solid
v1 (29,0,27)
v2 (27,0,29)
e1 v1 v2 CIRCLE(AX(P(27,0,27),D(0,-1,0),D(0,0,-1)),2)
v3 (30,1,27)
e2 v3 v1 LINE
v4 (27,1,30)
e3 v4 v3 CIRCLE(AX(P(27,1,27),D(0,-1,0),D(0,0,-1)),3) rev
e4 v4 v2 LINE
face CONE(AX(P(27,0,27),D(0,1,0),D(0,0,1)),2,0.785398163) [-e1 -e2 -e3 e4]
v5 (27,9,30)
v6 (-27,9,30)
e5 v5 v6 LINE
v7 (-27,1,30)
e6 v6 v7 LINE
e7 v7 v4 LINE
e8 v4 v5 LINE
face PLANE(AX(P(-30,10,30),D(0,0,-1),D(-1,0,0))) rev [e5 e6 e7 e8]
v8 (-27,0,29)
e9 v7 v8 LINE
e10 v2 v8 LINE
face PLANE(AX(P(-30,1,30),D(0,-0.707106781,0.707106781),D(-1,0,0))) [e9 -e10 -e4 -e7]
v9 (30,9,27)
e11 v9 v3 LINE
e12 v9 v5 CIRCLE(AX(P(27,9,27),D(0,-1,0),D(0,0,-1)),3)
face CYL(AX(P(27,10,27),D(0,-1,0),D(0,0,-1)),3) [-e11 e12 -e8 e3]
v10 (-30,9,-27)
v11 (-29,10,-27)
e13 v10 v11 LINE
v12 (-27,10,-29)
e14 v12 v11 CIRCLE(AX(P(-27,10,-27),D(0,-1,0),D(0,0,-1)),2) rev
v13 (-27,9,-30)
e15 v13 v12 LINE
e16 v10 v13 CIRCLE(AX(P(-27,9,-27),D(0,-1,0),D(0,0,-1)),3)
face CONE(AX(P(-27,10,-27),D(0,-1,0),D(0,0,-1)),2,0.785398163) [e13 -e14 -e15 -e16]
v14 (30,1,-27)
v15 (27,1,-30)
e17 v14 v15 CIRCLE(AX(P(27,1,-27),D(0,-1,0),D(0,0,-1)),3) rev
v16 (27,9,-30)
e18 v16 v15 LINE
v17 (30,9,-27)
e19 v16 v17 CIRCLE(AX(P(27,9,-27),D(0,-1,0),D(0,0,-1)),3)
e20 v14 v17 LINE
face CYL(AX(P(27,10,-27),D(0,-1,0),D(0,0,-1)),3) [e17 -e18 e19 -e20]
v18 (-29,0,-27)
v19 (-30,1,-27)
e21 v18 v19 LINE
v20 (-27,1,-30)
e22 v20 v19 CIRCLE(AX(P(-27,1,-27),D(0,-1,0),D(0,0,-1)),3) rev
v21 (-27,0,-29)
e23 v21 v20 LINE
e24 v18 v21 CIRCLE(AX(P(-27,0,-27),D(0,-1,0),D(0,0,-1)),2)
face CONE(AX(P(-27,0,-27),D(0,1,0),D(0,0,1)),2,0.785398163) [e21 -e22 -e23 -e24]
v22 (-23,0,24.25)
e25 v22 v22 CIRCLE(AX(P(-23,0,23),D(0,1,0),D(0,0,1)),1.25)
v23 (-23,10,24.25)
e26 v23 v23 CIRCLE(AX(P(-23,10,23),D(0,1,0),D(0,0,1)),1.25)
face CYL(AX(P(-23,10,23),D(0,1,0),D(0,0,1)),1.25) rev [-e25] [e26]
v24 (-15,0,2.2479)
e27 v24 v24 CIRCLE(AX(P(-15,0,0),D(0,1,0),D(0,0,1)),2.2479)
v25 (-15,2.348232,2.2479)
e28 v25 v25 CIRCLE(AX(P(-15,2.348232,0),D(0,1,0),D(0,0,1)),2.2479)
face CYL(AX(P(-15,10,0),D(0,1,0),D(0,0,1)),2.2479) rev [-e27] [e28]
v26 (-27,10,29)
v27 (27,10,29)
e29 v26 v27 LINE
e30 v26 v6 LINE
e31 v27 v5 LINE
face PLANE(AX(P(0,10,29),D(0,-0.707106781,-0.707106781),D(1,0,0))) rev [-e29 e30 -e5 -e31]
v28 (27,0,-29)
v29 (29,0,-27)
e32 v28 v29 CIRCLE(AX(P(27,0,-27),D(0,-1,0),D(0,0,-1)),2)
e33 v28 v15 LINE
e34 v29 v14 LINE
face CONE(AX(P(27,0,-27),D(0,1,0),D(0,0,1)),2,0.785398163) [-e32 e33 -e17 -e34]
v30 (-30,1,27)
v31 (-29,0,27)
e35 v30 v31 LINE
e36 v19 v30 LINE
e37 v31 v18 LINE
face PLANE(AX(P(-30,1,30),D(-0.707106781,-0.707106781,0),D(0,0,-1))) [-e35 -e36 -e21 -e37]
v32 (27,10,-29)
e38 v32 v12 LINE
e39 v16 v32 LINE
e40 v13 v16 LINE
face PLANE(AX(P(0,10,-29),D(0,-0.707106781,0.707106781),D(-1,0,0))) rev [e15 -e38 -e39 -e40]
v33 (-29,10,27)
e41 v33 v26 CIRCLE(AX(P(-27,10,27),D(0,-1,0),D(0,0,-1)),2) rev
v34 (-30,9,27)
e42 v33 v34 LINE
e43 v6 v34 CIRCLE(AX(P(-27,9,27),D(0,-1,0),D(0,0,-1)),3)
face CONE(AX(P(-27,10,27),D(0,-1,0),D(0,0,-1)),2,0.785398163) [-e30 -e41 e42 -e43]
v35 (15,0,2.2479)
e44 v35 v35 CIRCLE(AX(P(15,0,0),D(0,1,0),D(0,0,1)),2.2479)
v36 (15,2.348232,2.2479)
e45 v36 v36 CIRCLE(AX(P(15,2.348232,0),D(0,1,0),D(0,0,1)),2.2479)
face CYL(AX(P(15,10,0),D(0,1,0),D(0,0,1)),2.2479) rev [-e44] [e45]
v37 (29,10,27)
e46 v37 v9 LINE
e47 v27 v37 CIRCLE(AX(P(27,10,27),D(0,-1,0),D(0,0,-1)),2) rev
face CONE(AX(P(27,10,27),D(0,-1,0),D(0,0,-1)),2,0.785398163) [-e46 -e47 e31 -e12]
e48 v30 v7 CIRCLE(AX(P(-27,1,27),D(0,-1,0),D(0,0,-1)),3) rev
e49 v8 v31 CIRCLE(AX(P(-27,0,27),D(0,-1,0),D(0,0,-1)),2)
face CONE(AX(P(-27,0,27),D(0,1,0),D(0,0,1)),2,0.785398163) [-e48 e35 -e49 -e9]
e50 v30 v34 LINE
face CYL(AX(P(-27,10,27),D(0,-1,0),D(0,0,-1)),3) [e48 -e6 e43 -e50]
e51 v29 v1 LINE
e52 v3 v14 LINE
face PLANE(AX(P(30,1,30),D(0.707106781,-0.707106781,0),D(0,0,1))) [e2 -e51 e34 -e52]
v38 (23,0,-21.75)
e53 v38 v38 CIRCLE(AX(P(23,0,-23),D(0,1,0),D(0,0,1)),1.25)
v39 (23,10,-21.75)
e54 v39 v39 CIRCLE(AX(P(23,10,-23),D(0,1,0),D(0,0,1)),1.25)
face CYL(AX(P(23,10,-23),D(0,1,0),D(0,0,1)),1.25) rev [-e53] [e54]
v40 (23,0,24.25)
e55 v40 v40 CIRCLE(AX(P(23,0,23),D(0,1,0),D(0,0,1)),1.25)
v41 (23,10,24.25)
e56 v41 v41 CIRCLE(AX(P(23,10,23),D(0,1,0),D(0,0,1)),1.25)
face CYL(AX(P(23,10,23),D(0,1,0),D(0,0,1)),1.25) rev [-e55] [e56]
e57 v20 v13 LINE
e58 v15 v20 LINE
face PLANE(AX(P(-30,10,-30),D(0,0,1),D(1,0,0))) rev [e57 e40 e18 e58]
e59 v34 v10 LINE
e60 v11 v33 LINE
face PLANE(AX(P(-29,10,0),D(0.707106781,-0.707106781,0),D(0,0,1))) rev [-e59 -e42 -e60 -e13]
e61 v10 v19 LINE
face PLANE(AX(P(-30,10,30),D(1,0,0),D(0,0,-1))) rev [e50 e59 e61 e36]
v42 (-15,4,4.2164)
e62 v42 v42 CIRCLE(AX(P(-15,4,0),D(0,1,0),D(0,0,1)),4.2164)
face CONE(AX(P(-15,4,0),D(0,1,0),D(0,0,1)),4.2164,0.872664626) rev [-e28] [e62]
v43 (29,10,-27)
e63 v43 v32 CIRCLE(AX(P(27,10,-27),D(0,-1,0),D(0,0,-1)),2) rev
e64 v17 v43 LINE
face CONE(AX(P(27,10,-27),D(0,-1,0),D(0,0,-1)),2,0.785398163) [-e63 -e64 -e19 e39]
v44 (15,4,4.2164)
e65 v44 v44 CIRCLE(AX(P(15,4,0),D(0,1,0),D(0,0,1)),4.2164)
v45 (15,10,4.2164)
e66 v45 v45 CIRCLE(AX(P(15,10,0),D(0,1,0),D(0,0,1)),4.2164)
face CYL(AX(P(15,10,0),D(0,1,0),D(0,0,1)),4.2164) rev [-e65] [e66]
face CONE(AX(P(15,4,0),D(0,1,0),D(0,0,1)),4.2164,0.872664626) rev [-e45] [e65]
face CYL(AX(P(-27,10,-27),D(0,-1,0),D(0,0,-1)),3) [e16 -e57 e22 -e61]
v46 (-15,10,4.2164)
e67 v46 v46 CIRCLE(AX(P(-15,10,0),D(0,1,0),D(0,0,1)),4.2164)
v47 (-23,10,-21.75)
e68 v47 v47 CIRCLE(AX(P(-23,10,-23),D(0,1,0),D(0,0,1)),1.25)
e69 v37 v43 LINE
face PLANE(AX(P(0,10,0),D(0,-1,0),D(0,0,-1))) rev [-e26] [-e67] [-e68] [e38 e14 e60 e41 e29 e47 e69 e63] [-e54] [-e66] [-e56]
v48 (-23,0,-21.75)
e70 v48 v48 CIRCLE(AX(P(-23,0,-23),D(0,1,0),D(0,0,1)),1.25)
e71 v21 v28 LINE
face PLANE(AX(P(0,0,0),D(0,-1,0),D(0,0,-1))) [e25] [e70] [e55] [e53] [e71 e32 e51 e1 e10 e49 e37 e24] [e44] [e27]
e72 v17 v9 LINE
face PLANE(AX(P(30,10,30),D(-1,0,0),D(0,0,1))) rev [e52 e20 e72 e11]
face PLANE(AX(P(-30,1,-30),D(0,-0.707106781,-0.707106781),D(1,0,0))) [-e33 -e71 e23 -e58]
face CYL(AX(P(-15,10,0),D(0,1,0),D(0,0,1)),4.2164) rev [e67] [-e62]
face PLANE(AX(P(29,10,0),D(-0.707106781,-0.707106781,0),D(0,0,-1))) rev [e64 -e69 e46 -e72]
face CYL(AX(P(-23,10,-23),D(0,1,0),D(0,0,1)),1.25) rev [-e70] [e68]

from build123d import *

# Parameters (mm, degrees)
SKETCH1_W                                 = 60
SKETCH1_H                                 = 60
BOSS_EXTRUDE1_DEPTH                       = 10
FILLET1_R                                 = 3
M3X0_5_TAPPED_HOLE1_OUTLINE_R             = 1.25
M3X0_5_TAPPED_HOLE1_DEPTH                 = 10
CSK_FOR_8_FLAT_HEAD_MACHINE_SCREW_2_COUNT = 2
CSK_FOR_8_FLAT_HEAD_MACHINE_SCREW_2_PITCH = 30
CHAMFER1_SIZE                             = 1


# Read off the part's stored shape, not the designer's step: M3x0.5 Tapped Hole1
with BuildPart() as part:
    # Sketch1 → Boss-Extrude1 (new body)
    with BuildSketch(Plane(origin=(0, 0, 0), x_dir=(1, 0, 0), z_dir=(0, 1, 0))):
        Rectangle(SKETCH1_W, SKETCH1_H)
    extrude(amount=BOSS_EXTRUDE1_DEPTH)

    # Fillet1
    fillet1_edges = [part.edges().sort_by_distance(p)[0] for p in [
        (30, 5, 30),
        (-30, 5, 30),
        (-30, 5, -30),
        (30, 5, -30),
    ]]
    fillet(fillet1_edges, radius=FILLET1_R)

    # M3x0.5 Tapped Hole1 outline → M3x0.5 Tapped Hole1 (cut)
    with BuildSketch(Plane(origin=(0, 0, 0), x_dir=(1, 0, 0), z_dir=(0, 1, 0))):
        with Locations((23, -23)):
            Circle(M3X0_5_TAPPED_HOLE1_OUTLINE_R)
        with Locations((-23, 23)):
            Circle(M3X0_5_TAPPED_HOLE1_OUTLINE_R)
        with Locations((-23, -23)):
            Circle(M3X0_5_TAPPED_HOLE1_OUTLINE_R)
        with Locations((23, 23)):
            Circle(M3X0_5_TAPPED_HOLE1_OUTLINE_R)
    extrude(amount=M3X0_5_TAPPED_HOLE1_DEPTH, mode=Mode.SUBTRACT)

    # Sketch7 → CSK for #8 Flat Head Machine Screw (100)2 (revolve, cut)
    with BuildSketch(Plane(origin=(15, 10, 0), x_dir=(0, 0, 1), z_dir=(1, 0, 0))):
        Polygon((0, 0), (0, 10), (2.2479, 10), (2.2479, 7.651767624), (4.2164, 6), (4.2164, 0), align=None)
    csk_for_8_flat_head_machine_screw_100 = revolve(axis=Axis((15, 16.35, 0), (0, -1, 0)), mode=Mode.SUBTRACT)

    # CSK for _8 Flat Head Machine Screw _ 2: CSK for #8 Flat Head Machine Screw (100)2 ×2
    with Locations(*[(-i * CSK_FOR_8_FLAT_HEAD_MACHINE_SCREW_2_PITCH, 0, 0) for i in range(1, CSK_FOR_8_FLAT_HEAD_MACHINE_SCREW_2_COUNT)]):
        add(csk_for_8_flat_head_machine_screw_100, mode=Mode.SUBTRACT)

    # Chamfer1
    chamfer1_edges = [part.edges().sort_by_distance(p)[0] for p in [
        (-30, 0, 0),
        (-30, 10, 0),
        (30, 0, 0),
        (0, 0, 30),
        (0, 0, -30),
        (-29.121320344, 0, 29.121320344),
        (29.121320344, 0, 29.121320344),
        (29.121320344, 0, -29.121320344),
        (-29.121320344, 0, -29.121320344),
        (0, 10, -30),
        (30, 10, 0),
        (0, 10, 30),
        (-29.121320344, 10, 29.121320344),
        (29.121320344, 10, 29.121320344),
        (29.121320344, 10, -29.121320344),
        (-29.121320344, 10, -29.121320344),
    ]]
    chamfer(chamfer1_edges, length=CHAMFER1_SIZE)


solid = part.part
